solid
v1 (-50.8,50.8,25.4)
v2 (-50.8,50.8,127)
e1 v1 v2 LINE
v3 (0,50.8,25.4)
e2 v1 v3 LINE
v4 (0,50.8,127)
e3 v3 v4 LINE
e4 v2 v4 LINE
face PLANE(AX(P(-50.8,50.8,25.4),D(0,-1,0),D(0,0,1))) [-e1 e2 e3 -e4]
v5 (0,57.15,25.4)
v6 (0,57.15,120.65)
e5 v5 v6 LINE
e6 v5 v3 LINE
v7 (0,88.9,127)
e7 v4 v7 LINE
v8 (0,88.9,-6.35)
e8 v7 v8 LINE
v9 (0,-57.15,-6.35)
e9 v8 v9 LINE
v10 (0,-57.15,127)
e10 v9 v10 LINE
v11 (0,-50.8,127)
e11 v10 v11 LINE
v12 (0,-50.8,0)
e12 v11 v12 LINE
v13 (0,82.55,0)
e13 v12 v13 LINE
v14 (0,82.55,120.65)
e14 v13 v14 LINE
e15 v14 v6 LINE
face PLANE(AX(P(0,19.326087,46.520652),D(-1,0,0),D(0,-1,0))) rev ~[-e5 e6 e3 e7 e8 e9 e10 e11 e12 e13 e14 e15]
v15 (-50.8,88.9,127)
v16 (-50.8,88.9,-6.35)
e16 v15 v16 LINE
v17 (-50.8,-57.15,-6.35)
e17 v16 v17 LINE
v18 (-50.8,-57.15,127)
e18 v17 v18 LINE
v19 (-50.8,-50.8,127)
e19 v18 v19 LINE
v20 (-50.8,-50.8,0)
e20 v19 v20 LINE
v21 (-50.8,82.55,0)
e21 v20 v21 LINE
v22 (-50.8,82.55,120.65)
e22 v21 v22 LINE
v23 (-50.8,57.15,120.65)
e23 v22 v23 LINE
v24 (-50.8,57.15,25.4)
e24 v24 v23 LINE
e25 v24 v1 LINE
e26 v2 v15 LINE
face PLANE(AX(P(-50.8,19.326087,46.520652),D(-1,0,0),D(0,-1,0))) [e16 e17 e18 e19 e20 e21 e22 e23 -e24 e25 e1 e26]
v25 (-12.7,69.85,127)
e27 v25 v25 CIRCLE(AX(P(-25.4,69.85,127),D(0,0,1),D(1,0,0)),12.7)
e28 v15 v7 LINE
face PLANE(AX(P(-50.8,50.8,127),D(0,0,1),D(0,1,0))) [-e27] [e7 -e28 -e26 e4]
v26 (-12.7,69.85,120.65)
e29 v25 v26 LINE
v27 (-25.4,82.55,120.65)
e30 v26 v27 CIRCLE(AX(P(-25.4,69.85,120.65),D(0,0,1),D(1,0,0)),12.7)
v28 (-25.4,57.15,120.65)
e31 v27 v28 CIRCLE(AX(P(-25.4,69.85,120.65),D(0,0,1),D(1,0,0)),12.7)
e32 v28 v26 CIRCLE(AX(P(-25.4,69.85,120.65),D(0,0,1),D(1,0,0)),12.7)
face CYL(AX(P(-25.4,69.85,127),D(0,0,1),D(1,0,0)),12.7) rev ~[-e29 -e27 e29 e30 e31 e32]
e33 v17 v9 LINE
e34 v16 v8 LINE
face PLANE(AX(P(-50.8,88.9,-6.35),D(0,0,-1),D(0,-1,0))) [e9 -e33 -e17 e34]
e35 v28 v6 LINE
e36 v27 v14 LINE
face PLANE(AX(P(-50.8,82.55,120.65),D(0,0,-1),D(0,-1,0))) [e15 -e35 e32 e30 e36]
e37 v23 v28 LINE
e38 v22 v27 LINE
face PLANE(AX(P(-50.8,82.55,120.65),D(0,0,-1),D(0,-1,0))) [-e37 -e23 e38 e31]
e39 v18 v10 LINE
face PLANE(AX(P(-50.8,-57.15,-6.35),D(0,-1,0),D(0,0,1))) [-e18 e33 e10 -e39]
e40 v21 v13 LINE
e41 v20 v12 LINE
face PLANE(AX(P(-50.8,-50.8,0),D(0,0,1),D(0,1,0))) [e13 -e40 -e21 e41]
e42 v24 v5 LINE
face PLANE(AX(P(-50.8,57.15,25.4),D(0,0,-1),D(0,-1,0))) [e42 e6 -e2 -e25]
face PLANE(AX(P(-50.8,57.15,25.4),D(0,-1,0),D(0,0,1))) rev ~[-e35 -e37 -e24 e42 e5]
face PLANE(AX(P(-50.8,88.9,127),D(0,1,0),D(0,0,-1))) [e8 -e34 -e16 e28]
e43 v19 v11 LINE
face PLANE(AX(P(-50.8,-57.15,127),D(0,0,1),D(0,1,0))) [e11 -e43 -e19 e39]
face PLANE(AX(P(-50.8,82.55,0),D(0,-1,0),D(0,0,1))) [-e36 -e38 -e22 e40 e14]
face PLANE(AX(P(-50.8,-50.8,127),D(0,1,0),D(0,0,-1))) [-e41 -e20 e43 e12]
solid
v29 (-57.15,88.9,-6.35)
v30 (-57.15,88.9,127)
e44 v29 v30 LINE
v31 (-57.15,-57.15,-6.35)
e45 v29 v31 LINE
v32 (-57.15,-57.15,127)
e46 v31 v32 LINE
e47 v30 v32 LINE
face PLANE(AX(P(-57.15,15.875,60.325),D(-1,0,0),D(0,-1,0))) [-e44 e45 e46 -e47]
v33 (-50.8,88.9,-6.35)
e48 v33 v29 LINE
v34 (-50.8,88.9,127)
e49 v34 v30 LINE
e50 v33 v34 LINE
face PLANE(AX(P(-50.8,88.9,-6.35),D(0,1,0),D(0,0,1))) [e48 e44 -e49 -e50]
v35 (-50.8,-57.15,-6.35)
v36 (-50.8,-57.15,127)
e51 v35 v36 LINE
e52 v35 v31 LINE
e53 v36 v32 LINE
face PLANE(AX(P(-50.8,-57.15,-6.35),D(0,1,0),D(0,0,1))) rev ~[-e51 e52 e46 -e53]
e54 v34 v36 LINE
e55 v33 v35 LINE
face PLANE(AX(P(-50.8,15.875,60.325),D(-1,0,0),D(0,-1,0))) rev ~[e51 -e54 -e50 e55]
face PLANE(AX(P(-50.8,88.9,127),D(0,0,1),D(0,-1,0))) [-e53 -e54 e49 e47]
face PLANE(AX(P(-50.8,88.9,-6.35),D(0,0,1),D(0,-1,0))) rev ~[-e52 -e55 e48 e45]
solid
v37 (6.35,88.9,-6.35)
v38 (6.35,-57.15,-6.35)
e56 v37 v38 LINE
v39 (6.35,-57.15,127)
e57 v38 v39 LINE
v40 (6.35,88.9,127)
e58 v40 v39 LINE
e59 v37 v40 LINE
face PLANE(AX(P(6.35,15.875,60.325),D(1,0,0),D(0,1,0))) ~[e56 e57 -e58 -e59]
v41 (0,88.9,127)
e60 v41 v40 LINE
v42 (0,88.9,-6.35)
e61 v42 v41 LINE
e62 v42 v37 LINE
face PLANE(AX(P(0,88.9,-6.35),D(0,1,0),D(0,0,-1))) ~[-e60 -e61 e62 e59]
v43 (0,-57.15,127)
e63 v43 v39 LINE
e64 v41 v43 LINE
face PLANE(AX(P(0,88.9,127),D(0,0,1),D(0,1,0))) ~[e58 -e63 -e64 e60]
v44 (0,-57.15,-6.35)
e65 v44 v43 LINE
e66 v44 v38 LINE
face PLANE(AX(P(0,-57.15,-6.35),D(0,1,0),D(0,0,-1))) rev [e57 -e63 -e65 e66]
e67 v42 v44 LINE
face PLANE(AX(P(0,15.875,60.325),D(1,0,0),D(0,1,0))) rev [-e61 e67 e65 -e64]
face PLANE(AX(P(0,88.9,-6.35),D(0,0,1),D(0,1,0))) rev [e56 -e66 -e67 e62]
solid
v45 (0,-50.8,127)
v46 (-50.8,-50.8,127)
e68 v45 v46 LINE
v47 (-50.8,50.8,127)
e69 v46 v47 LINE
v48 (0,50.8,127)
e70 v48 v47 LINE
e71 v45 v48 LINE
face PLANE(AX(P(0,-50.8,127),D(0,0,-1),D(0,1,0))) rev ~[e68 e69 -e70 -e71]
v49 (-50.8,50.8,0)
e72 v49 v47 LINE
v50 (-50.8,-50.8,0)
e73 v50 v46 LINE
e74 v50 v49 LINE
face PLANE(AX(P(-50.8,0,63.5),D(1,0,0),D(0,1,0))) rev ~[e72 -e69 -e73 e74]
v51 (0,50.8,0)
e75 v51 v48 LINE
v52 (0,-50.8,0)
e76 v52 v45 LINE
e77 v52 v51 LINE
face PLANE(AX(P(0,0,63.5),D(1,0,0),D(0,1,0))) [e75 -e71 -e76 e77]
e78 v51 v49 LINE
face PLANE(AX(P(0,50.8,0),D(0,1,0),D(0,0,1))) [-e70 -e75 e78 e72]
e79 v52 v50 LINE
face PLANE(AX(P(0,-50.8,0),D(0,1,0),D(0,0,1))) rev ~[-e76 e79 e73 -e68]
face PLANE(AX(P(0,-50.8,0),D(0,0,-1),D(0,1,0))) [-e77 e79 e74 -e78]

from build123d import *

# Parameters (mm, degrees)
F0_W      = 101.6
F0_H      = 127
F1_DEPTH  = 50.8
F2_W      = 6.35
F2_H      = 95.25
F3_DEPTH  = 50.8
F4_W      = 146.05
F4_H      = 133.35
F5_DEPTH  = 6.35
F9_R      = 12.7
F10_DEPTH = 6.35


# Not quite as in the source:
# - a feature names something its author has since deleted; it is built from what else it names


with BuildPart() as f1:
    # F0 (on Right) → F1 (new body)
    with BuildSketch(Plane.YZ):
        with Locations((0, 63.5)):
            Rectangle(F0_W, F0_H)
    extrude(amount=-F1_DEPTH)


with BuildPart() as f3:
    # F2 (on face) → F3 (new body, through all)
    with BuildSketch(Plane(origin=(-50.8, 0, 0), x_dir=(0, -1, 0), z_dir=(-1, 0, 0))):
        Polygon((50.8, 127), (50.8, 0), (-82.55, 0), (-82.55, 120.65), (-57.15, 120.65), (-50.8, 120.65), (-50.8, 127), (-82.55, 127), (-88.9, 127), (-88.9, 0), (-88.9, -6.35), (57.15, -6.35), (57.15, 127), align=None)
        with Locations((-53.975, 73.025)):
            Rectangle(F2_W, F2_H)
    extrude(amount=-F3_DEPTH)

    # F9 (on face) → F10 (cut)
    with BuildSketch(Plane.XY.offset(127)):
        with Locations((-25.4, 69.85)):
            Circle(F9_R)
    extrude(amount=-F10_DEPTH, mode=Mode.SUBTRACT)


with BuildPart() as f5:
    # F4 (on face) → F5 (new body)
    with BuildSketch(Plane(origin=(-50.8, 0, 0), x_dir=(0, -1, 0), z_dir=(-1, 0, 0))):
        with Locations((-15.875, 60.325)):
            Rectangle(F4_W, F4_H)
    extrude(amount=F5_DEPTH)


with BuildPart() as f8_1:
    # F8: instance of F5
    add(f5.part.mirror(Plane(origin=(-25.4, 15.875, 60.325), x_dir=(0, -1, 0), z_dir=(1, 0, 0))))


solid = Compound([f1.part, f3.part, f5.part, f8_1.part])
